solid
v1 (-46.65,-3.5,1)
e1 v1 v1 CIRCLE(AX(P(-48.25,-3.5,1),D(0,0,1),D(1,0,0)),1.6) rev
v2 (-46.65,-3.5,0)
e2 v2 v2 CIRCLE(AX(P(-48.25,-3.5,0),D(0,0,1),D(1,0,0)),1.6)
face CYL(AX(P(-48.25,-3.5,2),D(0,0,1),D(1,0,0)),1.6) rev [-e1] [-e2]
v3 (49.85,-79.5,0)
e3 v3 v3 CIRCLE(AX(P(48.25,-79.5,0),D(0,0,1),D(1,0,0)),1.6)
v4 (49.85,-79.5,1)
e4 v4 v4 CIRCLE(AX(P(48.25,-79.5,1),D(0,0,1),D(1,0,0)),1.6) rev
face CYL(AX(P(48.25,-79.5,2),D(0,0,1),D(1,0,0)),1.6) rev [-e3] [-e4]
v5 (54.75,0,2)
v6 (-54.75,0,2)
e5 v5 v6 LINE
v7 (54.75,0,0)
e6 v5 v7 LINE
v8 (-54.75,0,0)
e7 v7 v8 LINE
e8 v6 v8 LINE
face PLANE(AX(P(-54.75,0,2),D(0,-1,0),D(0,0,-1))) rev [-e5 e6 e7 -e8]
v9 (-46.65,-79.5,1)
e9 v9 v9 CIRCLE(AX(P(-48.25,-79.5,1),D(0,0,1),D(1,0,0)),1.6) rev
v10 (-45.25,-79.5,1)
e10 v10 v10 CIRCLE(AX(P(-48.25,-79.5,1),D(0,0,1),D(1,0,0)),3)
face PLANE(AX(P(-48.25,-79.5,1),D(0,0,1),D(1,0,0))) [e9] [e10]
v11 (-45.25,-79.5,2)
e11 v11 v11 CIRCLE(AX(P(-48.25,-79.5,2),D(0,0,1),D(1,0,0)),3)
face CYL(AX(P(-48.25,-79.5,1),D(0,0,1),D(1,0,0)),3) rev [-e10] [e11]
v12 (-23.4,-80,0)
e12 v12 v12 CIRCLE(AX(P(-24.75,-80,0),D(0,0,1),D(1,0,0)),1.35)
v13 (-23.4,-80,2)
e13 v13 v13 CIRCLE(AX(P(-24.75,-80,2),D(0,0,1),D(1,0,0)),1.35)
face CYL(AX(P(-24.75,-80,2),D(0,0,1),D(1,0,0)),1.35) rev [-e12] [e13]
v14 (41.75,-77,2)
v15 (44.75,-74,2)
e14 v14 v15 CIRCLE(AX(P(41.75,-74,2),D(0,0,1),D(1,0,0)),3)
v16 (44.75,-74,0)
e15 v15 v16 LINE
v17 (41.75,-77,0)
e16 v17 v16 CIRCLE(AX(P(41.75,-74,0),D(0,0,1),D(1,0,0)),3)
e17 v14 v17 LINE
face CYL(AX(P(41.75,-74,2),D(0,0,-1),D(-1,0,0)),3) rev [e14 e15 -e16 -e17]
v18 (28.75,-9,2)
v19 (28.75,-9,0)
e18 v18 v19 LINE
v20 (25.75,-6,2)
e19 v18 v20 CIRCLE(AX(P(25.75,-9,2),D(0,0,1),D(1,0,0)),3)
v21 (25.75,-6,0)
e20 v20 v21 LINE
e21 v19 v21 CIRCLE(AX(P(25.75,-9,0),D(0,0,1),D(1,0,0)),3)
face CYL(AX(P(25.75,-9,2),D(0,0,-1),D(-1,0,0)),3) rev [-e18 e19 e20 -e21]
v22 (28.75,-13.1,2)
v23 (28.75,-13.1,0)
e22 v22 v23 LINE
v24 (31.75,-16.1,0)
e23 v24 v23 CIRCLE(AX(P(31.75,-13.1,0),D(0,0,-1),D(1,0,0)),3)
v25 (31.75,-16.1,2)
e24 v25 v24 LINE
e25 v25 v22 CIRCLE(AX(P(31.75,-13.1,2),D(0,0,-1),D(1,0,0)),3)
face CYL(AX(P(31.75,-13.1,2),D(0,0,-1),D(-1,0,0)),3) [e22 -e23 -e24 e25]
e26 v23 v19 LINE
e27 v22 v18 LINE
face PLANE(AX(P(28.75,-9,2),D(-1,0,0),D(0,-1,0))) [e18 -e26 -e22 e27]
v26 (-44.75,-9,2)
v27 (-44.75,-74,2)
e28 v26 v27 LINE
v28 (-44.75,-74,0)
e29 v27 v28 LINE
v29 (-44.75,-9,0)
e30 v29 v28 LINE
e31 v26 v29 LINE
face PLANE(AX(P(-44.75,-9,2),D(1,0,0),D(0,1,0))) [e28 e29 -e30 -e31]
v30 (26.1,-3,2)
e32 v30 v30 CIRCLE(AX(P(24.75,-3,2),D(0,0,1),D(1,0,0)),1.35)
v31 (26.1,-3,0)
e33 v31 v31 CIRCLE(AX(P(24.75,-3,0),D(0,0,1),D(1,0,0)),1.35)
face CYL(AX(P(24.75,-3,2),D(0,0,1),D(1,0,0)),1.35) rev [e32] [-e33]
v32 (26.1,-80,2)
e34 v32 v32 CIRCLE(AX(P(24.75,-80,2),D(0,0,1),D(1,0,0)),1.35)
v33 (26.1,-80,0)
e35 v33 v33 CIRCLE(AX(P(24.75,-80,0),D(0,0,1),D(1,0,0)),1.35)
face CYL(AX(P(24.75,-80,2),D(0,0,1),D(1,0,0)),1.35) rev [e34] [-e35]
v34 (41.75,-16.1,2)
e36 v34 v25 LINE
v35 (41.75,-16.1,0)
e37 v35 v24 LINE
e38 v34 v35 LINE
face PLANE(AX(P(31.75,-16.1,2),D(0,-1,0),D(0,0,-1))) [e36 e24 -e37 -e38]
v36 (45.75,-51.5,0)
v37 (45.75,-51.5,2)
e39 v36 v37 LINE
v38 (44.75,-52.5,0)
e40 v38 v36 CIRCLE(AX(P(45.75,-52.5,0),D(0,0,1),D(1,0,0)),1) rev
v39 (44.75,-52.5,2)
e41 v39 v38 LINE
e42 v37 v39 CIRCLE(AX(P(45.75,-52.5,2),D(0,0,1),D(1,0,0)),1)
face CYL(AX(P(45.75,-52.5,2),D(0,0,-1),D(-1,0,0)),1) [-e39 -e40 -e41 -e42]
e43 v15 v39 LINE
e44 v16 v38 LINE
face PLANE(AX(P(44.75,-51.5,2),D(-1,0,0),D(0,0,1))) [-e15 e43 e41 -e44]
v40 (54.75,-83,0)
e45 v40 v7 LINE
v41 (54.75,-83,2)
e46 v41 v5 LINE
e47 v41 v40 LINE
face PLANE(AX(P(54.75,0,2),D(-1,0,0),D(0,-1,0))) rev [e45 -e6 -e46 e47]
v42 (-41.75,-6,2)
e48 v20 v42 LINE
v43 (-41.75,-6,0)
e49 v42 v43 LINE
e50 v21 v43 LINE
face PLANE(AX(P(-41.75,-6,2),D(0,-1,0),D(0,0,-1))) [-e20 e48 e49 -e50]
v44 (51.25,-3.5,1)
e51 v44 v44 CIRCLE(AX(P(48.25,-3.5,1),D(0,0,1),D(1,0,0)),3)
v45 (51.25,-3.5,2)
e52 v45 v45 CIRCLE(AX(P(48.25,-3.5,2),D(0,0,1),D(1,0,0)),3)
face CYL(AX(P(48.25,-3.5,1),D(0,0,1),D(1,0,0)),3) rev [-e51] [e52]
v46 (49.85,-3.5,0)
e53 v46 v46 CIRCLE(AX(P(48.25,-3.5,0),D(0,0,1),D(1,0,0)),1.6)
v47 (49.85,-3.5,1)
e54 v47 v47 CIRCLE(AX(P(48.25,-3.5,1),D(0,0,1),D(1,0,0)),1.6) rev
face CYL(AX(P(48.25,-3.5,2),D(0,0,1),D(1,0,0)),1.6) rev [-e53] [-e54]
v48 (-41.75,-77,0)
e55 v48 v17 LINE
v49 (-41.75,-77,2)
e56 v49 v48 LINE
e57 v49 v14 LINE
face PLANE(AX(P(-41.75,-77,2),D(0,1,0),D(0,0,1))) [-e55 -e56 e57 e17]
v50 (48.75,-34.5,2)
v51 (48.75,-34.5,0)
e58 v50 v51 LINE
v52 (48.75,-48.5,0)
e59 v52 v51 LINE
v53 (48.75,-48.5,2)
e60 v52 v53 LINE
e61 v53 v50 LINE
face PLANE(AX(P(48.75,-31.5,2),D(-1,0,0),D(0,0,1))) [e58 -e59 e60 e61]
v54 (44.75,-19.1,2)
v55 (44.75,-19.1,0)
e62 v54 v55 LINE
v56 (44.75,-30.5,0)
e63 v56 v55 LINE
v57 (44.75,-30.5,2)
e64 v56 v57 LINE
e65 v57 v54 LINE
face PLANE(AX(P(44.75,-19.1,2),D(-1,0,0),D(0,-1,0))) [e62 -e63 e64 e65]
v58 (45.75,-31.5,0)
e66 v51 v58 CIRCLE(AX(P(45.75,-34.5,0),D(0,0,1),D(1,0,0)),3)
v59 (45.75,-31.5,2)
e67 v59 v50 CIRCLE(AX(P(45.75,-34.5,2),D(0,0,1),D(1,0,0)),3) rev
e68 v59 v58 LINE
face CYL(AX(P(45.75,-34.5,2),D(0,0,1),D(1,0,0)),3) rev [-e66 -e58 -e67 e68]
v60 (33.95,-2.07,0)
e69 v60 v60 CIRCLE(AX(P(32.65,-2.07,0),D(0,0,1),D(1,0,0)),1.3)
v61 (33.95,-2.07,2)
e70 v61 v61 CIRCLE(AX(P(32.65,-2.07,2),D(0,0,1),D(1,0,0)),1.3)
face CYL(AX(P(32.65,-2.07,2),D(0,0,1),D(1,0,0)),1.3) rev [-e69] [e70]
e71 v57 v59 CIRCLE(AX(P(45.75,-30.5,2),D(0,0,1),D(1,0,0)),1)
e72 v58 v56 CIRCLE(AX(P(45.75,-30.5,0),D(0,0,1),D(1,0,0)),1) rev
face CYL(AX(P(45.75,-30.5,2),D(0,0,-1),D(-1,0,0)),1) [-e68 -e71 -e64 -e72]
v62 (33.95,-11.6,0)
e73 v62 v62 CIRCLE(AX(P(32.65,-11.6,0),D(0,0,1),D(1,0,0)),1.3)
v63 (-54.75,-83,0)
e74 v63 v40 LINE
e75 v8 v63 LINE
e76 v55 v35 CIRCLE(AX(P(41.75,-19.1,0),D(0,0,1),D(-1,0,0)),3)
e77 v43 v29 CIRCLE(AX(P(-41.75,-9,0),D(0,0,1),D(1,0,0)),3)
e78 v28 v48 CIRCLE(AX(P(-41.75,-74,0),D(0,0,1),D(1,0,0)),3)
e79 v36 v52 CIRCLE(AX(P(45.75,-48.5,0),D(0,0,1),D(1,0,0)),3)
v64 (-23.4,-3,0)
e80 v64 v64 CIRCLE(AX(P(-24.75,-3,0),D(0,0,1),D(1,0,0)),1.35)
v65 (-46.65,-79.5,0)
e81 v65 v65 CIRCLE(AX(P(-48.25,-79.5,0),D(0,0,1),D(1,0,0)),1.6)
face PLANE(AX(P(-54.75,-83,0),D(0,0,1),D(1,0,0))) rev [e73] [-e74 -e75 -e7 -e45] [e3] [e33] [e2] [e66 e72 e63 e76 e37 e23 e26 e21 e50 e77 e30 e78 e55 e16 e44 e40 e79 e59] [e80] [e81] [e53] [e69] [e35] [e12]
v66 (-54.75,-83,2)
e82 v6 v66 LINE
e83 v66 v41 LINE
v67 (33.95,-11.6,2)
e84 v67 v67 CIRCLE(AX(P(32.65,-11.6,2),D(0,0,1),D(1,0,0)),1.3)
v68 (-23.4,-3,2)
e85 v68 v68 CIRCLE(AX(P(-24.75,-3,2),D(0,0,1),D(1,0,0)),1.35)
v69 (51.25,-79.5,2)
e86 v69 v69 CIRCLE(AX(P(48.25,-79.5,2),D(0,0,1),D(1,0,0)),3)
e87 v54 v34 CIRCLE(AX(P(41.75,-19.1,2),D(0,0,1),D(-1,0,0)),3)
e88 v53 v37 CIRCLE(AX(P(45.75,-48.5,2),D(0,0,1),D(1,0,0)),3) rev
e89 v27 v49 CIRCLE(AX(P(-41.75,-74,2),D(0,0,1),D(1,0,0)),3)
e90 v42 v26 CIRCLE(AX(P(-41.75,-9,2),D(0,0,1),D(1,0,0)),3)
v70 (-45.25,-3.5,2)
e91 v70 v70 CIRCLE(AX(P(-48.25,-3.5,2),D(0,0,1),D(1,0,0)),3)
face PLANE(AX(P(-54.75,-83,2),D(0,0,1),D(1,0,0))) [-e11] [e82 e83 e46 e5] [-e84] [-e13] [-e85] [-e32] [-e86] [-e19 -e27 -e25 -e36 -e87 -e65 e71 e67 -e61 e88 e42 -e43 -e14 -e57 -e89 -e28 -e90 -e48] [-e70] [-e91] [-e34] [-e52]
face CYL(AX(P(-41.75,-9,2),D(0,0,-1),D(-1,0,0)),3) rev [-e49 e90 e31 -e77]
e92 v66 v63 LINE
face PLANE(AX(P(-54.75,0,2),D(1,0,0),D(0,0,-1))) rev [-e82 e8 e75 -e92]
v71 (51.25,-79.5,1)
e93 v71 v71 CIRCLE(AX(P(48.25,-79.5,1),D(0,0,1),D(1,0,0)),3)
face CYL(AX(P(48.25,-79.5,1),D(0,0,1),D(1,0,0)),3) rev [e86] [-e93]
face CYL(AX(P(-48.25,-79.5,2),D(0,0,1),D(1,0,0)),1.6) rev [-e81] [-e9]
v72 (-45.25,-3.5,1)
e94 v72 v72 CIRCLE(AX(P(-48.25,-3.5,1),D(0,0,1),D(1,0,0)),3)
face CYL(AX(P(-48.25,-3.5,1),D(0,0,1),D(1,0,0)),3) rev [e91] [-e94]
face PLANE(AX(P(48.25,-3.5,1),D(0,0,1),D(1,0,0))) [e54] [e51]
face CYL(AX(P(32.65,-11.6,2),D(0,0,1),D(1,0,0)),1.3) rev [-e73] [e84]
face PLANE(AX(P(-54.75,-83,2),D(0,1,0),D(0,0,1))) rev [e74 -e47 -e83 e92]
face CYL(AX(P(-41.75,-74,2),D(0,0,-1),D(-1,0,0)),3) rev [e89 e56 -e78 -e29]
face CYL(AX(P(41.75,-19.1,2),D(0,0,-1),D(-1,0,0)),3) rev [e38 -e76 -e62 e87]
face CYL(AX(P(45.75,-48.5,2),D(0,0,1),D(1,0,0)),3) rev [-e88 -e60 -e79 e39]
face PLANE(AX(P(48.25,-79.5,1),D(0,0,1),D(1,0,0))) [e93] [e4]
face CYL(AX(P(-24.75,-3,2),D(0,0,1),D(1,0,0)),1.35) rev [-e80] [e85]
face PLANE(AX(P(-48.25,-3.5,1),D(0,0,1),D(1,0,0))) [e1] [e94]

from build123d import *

# Parameters (mm, degrees)
SKETCH1_W                  = 109.5
SKETCH1_H                  = 83
BOSS_EXTRUDE1_DEPTH        = 2
F_3_2_3_2_DIAMETER_HOLE2_D = 3.2
F_2_6_2_6_DIAMETER_HOLE2_D = 2.6
F_2_6_2_6_DIAMETER_HOLE1_D = 2.6
SKETCH9_R                  = 3
CUT_EXTRUDE1_DEPTH         = 1
F_2_7_2_7_DIAMETER_HOLE1_D = 2.7
FILLET1_R                  = 1
FILLET2_R                  = 3


with BuildPart() as part:
    # Sketch1 → Boss-Extrude1 (new body)
    with BuildSketch(Plane.XY):
        with Locations((0, -41.5)):
            Rectangle(SKETCH1_W, SKETCH1_H)
        with BuildLine():
            Line((28.75, -9), (28.75, -13.1))
            ThreePointArc((28.75, -13.1), (29.628679656, -15.221320344), (31.75, -16.1))
            Line((31.75, -16.1), (41.75, -16.1))
            ThreePointArc((41.75, -16.1), (43.871320344, -16.978679656), (44.75, -19.1))
            Line((44.75, -19.1), (44.75, -31.5))
            Line((44.75, -31.5), (48.75, -31.5))
            Line((48.75, -31.5), (48.75, -41.5))
            Line((48.75, -41.5), (48.75, -51.5))
            Line((48.75, -51.5), (44.75, -51.5))
            Line((44.75, -51.5), (44.75, -74))
            ThreePointArc((44.75, -74), (43.871320344, -76.121320344), (41.75, -77))
            Line((41.75, -77), (-41.75, -77))
            ThreePointArc((-41.75, -77), (-43.871320344, -76.121320344), (-44.75, -74))
            Line((-44.75, -74), (-44.75, -9))
            ThreePointArc((-44.75, -9), (-43.871320344, -6.878679656), (-41.75, -6))
            Line((-41.75, -6), (25.75, -6))
            ThreePointArc((25.75, -6), (27.871320344, -6.878679656), (28.75, -9))
        make_face(mode=Mode.SUBTRACT)
    extrude(amount=BOSS_EXTRUDE1_DEPTH)

    # Ø3.2 (3.2) Diameter Hole2 (through all)
    with Locations(Plane.XY.offset(2)):
        with Locations((-48.25, -3.5), (-48.25, -79.5), (48.25, -79.5), (48.25, -3.5)):
            Hole(F_3_2_3_2_DIAMETER_HOLE2_D / 2)

    # Ø2.6 (2.6) Diameter Hole2 (through all)
    with Locations(Plane.XY.offset(2)):
        with Locations((32.65, -11.6)):
            Hole(F_2_6_2_6_DIAMETER_HOLE2_D / 2)

    # Ø2.6 (2.6) Diameter Hole1 (through all)
    with Locations(Plane.XY.offset(2)):
        with Locations((32.65, -2.07)):
            Hole(F_2_6_2_6_DIAMETER_HOLE1_D / 2)

    # Sketch9 → Cut-Extrude1 (cut)
    with BuildSketch(Plane.XY.offset(2)):
        with Locations((-48.25, -3.5)):
            Circle(SKETCH9_R)
        with Locations((48.25, -3.5)):
            Circle(SKETCH9_R)
        with Locations((48.25, -79.5)):
            Circle(SKETCH9_R)
        with Locations((-48.25, -79.5)):
            Circle(SKETCH9_R)
    extrude(amount=-CUT_EXTRUDE1_DEPTH, mode=Mode.SUBTRACT)

    # Ø2.7 (2.7) Diameter Hole1 (through all)
    with Locations(Plane.XY.offset(2)):
        with Locations((-24.75, -3), (24.75, -3), (-24.75, -80), (24.75, -80)):
            Hole(F_2_7_2_7_DIAMETER_HOLE1_D / 2)

    # Fillet1
    fillet1_edges = [part.edges().sort_by_distance(p)[0] for p in [
        (44.75, -51.5, 1),
        (44.75, -31.5, 1),
    ]]
    fillet(fillet1_edges, radius=FILLET1_R)

    # Fillet2
    fillet2_edges = [part.edges().sort_by_distance(p)[0] for p in [
        (48.75, -31.5, 1),
        (48.75, -51.5, 1),
    ]]
    fillet(fillet2_edges, radius=FILLET2_R - 0.0001)  # a hair under: the kernel refuses the full size


solid = part.part
